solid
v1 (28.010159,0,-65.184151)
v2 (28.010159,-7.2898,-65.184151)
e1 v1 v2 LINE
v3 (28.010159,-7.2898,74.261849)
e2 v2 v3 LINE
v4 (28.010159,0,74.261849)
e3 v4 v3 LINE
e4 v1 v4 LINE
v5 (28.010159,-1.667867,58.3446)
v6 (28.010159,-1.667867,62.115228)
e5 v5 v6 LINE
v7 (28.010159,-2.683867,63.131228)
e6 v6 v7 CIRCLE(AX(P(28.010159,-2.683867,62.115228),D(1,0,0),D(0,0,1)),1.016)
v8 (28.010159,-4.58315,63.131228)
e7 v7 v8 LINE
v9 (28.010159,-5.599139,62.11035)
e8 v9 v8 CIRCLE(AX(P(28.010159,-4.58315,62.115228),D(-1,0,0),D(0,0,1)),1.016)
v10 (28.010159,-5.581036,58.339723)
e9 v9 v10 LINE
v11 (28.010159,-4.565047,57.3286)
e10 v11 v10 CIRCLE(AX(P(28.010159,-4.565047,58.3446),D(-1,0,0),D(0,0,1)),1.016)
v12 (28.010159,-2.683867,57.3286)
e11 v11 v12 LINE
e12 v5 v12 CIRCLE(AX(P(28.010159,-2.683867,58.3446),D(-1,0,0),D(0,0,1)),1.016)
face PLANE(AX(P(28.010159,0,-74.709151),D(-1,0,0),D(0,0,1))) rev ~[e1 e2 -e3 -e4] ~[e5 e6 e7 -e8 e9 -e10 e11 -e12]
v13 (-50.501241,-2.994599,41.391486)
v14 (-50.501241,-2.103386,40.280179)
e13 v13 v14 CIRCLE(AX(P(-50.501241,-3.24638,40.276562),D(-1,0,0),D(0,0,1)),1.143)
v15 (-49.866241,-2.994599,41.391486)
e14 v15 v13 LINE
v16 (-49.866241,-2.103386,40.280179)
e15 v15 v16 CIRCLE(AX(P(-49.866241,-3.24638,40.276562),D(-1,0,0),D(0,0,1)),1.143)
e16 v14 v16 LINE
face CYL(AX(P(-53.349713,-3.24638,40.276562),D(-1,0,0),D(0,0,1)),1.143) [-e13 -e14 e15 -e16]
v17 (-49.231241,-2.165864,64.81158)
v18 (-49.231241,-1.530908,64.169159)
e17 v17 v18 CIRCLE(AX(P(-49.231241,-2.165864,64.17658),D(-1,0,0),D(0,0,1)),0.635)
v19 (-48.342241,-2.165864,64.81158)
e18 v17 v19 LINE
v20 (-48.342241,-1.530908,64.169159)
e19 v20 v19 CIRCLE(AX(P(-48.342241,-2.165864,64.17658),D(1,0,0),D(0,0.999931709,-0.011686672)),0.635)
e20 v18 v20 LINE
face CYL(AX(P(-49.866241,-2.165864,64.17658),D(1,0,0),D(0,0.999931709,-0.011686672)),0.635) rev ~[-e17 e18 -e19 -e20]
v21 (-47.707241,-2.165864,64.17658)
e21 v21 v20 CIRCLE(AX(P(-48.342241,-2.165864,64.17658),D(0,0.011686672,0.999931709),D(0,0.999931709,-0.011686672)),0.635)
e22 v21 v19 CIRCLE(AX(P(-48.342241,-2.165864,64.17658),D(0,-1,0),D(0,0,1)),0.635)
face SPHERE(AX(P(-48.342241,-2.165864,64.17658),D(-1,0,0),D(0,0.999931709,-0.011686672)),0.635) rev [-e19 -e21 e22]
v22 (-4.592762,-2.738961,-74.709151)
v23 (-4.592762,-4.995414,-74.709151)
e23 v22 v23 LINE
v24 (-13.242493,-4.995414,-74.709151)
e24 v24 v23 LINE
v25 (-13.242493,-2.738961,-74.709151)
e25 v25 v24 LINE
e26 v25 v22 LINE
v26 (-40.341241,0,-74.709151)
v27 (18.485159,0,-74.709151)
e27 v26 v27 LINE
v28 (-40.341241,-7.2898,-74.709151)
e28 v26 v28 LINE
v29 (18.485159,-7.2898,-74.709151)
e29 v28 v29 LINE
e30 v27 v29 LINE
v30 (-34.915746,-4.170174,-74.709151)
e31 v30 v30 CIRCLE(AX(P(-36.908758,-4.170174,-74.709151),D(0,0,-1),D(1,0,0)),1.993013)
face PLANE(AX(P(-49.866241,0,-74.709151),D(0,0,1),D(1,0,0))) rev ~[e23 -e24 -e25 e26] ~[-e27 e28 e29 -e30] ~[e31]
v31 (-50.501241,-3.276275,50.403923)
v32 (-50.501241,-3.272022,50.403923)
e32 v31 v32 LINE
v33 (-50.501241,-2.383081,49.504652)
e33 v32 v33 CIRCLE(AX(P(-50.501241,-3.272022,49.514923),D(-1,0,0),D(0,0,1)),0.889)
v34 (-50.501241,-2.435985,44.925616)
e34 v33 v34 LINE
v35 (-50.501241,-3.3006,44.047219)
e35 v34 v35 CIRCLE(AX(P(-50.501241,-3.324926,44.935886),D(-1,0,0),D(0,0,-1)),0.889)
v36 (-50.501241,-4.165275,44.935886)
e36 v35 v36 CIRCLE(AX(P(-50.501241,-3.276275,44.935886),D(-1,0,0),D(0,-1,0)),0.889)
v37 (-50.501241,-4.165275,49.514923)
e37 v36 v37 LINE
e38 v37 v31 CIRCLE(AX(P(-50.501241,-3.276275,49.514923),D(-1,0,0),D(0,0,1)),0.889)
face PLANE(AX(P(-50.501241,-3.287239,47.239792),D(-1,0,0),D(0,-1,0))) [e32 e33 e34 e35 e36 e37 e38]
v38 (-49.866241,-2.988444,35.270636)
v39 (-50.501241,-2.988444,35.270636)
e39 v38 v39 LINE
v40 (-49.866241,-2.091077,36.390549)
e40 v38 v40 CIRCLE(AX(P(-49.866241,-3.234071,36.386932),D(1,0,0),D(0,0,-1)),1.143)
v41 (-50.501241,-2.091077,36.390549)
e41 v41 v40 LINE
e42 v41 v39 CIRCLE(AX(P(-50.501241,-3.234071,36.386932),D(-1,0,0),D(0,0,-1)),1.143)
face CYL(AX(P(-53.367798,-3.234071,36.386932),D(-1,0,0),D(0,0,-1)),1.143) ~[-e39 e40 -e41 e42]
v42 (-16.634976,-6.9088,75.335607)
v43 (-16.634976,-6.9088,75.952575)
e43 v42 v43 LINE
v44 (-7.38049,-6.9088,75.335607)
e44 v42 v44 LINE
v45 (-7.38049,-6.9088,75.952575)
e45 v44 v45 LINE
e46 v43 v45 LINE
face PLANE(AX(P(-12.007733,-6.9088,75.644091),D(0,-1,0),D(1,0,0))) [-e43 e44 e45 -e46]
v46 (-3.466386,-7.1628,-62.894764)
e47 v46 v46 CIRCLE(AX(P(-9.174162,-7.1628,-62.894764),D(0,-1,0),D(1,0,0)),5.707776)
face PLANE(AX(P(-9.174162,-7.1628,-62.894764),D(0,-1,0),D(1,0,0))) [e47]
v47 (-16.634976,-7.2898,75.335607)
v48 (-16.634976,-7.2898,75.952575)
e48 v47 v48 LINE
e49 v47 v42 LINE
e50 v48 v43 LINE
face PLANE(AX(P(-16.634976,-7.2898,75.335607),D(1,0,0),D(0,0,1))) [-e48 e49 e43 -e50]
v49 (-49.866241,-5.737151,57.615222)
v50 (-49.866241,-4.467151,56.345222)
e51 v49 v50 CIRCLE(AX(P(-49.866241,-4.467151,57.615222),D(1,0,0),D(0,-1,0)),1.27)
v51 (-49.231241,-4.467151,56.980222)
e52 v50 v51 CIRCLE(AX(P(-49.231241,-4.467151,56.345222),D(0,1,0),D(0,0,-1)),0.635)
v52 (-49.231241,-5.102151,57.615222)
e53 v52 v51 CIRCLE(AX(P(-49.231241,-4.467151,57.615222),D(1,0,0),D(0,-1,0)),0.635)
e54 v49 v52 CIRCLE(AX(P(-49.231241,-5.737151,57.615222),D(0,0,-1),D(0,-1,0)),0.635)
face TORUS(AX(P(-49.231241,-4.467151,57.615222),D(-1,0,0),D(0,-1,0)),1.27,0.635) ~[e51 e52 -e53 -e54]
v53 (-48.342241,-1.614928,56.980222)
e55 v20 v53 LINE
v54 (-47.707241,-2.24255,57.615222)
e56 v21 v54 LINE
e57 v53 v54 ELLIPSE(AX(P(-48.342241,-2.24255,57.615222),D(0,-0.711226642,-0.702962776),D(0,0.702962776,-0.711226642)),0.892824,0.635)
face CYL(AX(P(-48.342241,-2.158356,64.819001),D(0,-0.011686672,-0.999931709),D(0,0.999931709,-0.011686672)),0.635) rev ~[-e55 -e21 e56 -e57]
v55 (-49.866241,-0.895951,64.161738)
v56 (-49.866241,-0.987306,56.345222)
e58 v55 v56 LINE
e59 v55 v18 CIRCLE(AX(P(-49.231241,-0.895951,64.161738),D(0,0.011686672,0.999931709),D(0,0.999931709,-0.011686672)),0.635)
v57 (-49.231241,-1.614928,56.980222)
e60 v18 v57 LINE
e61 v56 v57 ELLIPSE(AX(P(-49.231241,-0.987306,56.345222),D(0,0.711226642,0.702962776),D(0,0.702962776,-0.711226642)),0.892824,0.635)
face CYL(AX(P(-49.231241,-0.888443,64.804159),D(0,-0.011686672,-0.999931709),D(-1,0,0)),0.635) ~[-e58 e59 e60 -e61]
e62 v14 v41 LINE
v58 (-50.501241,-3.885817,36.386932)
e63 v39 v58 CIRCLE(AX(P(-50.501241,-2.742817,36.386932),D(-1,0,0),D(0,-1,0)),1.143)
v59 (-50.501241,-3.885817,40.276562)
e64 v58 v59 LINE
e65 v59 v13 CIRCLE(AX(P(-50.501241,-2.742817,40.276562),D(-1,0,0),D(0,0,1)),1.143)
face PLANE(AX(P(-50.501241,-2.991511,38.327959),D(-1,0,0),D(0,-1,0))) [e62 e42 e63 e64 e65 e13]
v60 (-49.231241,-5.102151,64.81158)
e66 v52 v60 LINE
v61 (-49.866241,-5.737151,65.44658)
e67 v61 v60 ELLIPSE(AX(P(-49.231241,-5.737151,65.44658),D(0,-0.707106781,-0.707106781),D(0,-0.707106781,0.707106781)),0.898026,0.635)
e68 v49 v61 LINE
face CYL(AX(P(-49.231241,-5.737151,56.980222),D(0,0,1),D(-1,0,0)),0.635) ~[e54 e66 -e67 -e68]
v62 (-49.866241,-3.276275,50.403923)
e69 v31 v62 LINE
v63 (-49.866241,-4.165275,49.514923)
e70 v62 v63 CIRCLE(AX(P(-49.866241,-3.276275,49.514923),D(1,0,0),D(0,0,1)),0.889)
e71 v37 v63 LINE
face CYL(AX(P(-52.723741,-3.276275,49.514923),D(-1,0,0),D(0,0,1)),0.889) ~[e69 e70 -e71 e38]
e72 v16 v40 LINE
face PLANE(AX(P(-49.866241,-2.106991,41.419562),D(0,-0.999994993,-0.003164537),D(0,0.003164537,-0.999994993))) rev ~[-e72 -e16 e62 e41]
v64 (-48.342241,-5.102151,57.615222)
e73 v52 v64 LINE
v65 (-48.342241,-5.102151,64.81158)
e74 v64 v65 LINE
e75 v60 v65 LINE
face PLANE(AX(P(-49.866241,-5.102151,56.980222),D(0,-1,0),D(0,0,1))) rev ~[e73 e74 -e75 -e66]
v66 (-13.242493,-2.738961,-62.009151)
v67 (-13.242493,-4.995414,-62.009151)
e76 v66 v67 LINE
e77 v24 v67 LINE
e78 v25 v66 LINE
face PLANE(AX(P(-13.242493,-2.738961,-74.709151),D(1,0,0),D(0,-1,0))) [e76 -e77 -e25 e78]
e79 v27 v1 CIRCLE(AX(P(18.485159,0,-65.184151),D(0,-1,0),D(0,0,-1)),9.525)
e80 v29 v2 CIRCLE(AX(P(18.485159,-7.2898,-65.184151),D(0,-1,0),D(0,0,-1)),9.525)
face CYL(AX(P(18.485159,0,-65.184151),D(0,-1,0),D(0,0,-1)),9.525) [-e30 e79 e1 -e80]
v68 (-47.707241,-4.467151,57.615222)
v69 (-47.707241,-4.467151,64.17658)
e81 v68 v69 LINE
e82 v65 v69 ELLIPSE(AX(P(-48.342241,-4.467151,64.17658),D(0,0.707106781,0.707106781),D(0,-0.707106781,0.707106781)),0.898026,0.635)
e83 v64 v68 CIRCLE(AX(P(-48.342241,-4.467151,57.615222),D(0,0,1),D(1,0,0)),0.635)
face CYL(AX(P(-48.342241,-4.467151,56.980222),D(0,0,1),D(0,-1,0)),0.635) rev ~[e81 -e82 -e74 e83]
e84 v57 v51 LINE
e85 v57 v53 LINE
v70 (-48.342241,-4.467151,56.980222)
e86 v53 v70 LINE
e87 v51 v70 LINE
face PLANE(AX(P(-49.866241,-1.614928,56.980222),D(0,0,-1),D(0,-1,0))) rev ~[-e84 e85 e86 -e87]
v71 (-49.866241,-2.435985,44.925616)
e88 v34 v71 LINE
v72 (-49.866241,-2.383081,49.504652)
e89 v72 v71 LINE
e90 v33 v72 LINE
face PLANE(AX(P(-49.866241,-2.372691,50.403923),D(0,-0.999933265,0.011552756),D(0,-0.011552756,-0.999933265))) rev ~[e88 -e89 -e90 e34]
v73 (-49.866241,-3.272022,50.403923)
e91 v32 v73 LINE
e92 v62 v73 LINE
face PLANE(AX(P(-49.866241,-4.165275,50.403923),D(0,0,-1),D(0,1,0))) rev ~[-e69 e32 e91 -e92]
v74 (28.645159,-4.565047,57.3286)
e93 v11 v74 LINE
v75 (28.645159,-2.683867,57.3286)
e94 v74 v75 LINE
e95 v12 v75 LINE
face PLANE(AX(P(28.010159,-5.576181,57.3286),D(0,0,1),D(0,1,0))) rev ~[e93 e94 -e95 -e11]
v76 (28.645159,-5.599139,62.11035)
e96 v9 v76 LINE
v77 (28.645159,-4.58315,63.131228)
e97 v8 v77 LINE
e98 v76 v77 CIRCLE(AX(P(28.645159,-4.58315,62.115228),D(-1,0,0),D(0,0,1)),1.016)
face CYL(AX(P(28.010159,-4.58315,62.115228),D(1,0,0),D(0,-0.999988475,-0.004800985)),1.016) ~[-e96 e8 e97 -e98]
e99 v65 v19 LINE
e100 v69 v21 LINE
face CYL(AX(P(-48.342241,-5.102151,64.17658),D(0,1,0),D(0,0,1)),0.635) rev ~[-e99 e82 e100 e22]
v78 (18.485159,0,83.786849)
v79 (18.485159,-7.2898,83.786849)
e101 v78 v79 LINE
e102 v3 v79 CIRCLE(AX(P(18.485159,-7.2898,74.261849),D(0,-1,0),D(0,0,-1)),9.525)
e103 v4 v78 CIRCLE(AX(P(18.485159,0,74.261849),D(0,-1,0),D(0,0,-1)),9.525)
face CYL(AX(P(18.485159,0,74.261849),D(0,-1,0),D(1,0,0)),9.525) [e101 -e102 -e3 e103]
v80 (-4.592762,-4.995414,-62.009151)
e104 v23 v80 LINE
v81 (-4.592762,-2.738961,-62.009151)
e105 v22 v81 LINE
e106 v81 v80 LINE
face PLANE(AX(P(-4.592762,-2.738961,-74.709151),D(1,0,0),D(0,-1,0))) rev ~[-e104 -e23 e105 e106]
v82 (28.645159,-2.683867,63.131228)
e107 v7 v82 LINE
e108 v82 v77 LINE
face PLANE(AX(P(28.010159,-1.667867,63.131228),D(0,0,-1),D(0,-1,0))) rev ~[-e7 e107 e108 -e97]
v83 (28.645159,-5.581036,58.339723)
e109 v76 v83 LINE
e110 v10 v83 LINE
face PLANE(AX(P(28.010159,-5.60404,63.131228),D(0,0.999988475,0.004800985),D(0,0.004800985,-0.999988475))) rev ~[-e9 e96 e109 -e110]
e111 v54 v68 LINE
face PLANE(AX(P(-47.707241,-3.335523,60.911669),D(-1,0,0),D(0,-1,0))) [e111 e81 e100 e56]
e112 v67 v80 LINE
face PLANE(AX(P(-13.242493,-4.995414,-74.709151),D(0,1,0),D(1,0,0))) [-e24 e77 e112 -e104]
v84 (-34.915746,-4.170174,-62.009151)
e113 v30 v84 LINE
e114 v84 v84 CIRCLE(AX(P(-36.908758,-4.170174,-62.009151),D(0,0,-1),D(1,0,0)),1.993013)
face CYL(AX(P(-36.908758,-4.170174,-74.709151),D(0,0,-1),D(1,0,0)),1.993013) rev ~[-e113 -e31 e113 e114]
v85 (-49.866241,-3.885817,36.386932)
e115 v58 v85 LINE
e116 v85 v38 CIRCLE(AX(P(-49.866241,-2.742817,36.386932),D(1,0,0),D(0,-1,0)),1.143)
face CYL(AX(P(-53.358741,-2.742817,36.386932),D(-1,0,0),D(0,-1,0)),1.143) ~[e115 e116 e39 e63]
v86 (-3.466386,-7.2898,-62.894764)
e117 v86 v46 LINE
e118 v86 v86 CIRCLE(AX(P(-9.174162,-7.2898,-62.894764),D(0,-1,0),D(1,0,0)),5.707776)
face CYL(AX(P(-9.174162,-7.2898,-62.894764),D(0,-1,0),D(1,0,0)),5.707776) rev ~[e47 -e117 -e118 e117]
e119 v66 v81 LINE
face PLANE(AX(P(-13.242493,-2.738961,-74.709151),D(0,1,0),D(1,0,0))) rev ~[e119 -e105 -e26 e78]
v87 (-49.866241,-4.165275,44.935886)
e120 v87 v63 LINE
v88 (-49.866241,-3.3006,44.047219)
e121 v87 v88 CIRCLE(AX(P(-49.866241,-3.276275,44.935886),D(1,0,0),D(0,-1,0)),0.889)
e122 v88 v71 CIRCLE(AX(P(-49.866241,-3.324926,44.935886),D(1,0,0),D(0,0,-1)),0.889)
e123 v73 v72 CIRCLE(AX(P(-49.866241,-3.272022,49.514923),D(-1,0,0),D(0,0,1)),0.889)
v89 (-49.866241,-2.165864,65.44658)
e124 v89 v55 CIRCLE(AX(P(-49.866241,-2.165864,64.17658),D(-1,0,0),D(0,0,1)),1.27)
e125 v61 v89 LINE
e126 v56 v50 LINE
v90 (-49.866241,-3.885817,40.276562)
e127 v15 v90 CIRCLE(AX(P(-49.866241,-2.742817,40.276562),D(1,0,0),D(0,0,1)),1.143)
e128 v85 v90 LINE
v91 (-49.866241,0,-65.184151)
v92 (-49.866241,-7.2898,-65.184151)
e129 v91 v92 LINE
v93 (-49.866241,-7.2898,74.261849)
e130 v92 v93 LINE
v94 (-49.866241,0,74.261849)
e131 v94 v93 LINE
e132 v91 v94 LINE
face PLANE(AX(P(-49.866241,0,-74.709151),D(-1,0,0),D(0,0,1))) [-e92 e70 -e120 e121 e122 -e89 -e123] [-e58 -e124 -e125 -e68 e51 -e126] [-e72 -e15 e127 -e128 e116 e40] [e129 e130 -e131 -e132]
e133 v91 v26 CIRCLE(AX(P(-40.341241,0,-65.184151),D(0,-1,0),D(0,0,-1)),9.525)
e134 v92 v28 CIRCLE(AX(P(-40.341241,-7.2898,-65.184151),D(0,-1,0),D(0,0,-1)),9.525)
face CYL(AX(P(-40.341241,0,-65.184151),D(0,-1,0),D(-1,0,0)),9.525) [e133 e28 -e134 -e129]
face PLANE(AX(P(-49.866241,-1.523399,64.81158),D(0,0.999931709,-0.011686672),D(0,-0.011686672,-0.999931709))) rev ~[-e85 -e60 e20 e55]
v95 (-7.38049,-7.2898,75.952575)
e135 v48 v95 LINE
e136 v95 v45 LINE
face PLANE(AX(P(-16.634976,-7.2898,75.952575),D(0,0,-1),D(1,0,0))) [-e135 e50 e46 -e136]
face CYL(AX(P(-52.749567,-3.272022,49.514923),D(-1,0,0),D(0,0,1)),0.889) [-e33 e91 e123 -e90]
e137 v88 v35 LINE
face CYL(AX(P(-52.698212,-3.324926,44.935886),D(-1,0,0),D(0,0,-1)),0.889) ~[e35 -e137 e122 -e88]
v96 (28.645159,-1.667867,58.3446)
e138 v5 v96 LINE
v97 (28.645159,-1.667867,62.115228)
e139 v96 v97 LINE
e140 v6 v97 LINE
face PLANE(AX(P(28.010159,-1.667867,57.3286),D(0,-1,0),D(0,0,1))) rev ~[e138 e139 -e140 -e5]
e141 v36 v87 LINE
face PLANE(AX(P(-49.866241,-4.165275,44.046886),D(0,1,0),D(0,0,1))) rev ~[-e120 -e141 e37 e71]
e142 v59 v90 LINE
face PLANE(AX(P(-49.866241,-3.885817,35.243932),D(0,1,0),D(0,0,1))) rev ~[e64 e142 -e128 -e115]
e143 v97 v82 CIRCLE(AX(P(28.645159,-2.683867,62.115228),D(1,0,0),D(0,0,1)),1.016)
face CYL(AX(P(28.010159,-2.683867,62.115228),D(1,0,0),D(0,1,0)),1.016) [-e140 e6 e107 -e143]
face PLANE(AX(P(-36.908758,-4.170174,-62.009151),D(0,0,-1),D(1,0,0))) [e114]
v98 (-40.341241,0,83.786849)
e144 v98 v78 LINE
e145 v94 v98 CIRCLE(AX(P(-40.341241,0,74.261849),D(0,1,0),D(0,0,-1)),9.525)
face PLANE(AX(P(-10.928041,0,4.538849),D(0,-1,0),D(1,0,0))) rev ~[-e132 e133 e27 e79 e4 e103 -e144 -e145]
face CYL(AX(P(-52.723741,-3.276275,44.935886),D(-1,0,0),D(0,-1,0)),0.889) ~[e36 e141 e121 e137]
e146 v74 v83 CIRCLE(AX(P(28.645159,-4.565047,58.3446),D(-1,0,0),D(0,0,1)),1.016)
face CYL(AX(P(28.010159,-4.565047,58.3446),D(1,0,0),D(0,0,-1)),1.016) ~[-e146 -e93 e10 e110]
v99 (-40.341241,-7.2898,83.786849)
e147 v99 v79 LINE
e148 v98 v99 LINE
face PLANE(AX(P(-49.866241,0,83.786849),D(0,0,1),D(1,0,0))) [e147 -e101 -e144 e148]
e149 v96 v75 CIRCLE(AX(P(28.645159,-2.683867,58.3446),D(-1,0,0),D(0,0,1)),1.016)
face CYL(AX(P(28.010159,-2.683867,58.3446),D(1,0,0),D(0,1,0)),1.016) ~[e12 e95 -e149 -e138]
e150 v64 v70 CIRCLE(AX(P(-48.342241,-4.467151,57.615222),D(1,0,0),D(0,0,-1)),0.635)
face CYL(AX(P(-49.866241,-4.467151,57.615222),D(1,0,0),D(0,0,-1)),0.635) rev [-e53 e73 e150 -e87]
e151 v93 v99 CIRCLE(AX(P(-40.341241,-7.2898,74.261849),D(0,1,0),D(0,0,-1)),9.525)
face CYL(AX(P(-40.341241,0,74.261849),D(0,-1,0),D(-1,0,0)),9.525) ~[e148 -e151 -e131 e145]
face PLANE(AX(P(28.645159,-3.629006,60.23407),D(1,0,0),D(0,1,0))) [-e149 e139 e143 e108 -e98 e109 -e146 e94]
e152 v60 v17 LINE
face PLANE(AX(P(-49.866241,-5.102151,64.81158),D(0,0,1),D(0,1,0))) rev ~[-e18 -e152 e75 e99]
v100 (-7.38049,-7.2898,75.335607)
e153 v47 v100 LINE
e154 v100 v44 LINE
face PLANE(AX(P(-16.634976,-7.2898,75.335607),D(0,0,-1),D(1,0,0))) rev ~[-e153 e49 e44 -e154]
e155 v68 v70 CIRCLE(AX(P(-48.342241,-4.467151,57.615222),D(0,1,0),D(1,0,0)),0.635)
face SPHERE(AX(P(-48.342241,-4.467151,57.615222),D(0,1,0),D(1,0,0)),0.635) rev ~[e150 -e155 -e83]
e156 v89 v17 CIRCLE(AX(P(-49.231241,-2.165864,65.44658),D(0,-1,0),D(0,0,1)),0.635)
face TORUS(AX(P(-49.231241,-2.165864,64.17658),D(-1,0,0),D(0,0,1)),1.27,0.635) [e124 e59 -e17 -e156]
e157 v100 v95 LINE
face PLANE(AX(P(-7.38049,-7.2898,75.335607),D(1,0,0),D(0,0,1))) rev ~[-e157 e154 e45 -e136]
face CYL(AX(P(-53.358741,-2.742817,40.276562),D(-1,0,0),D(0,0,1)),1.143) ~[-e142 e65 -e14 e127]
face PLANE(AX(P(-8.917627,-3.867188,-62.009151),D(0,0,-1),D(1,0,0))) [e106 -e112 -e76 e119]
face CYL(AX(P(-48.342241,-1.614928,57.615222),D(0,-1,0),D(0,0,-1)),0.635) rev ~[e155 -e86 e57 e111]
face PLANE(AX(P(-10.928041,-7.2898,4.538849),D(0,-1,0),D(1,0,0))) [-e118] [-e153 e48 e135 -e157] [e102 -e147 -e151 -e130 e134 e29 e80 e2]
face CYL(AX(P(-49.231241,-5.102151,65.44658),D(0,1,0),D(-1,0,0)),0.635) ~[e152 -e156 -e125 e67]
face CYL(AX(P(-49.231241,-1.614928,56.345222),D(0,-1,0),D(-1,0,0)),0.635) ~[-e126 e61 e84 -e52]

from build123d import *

# Parameters (mm, degrees)
F0_W         = 77.8764
F0_H         = 158.496
F1_DEPTH     = 7.2898
F2_R         = 9.525
F3_R         = 5.7077755574
F4_DEPTH     = 0.127
F5_W         = 9.2544863001
F5_H         = 0.6169676781
F6_DEPTH     = 0.381
F8_DEPTH     = 0.635
F9_R         = 1.016
F10_R        = 1.9930126565
F11_DEPTH    = 12.7
F13_W        = 8.6497310549
F13_H        = 2.2564521059
F14_DEPTH    = 12.7
F16_DEPTH    = 2.159
F18_DEPTH    = 0.635
F19_T1_DEPTH = 2.8833260431
F19_T3_DEPTH = 2.8575
F19_T5_DEPTH = 2.8319706152
F21_DEPTH    = 0.635
F22_T1_DEPTH = 3.4834715988
F22_T3_DEPTH = 3.4925
F22_T5_DEPTH = 3.5015570173
F23_R        = 0.635


# Not quite as in the source:
# - a fillet or chamfer that OpenCascade refuses, or shapes differently, is made with other operations: its cross-section is extruded or revolved along the edge and cut away or added


with BuildPart() as f1:
    # F0 (on Front) → F1 (new body)
    with BuildSketch(Plane.XZ):
        with Locations((-10.9280409528, 4.5388489962)):
            Rectangle(F0_W, F0_H)
    extrude(amount=F1_DEPTH)

    # F2
    f2_edges = [f1.edges().sort_by_distance(p)[0] for p in [
        (-49.866241, -3.6449, 83.786849),
        (28.010159, -3.6449, 83.786849),
        (28.010159, -3.6449, -74.709151),
        (-49.866241, -3.6449, -74.709151),
    ]]
    fillet(f2_edges, radius=F2_R)

    # F3 (on face) → F4 (cut)
    with BuildSketch(Plane.XZ.offset(7.2898)):
        with Locations((-9.174161778, -62.8947635373)):
            Circle(F3_R)
    extrude(amount=-F4_DEPTH, mode=Mode.SUBTRACT)

    # F5 (on face) → F6 (cut)
    with BuildSketch(Plane.XZ.offset(7.2898)):
        with Locations((-12.0077328756, 75.6440907717)):
            Rectangle(F5_W, F5_H)
    extrude(amount=-F6_DEPTH, mode=Mode.SUBTRACT)

    # F7 (on face) → F8 (join)
    with BuildSketch(Plane.YZ.offset(28.0101590472)):
        Polygon((-1.6678672982, 63.1312280893), (-5.6040398777, 63.1312280893), (-5.5761812255, 57.3286004364), (-1.6678672982, 57.3286004364), align=None)
    extrude(amount=F8_DEPTH)

    # F9
    f9_edges = [f1.edges().sort_by_distance(p)[0] for p in [
        (28.327659, -5.60404, 63.131228),
        (28.327659, -5.576181, 57.3286),
        (28.327659, -1.667867, 63.131228),
        (28.327659, -1.667867, 57.3286),
    ]]
    fillet(f9_edges, radius=F9_R)

    # F10 (on face) → F11 (cut)
    with BuildSketch(Plane(origin=(0, 0, -74.7091510038), x_dir=(1, 0, 0), z_dir=(0, 0, -1))):
        with Locations((-36.9087584466, 4.1701743638)):
            Circle(F10_R)
    extrude(amount=-F11_DEPTH, mode=Mode.SUBTRACT)

    # F13 (on face) → F14 (cut)
    with BuildSketch(Plane(origin=(0, 0, -74.7091510038), x_dir=(1, 0, 0), z_dir=(0, 0, -1))):
        with Locations((-8.9176273905, 3.8671875373)):
            Rectangle(F13_W, F13_H)
    extrude(amount=-F14_DEPTH, mode=Mode.SUBTRACT)

    # F15 (on face) → F16 (cut)
    with BuildSketch(Plane(origin=(-49.8662409528, 0, 0), x_dir=(0, -1, 0), z_dir=(-1, 0, 0))):
        Polygon((1.5233993763, 64.8115798831), (1.6149281291, 56.9802224636), (5.1021506079, 56.9802224636), (5.1021506079, 64.8115798831), align=None)
    extrude(amount=-F16_DEPTH, mode=Mode.SUBTRACT)

    # F17 (on face) → F18 (join)
    with BuildSketch(Plane(origin=(-49.8662409528, 0, 0), x_dir=(0, -1, 0), z_dir=(-1, 0, 0))):
        Polygon((2.3726914078, 50.4039227962), (2.4461376015, 44.0468862653), (4.1652750224, 44.0468862653), (4.1652750224, 50.4039227962), align=None)
    extrude(amount=F18_DEPTH)

    # F19: fillet of radius 0.889 on 4 edges, made by hand

    # F19_s2 → F19_t1 (cut)
    with BuildSketch(Plane.YZ.offset(-52.7495669959)):
        with BuildLine():
            ThreePointArc((-3.272021825, 50.4039227962), (-2.639783189, 50.1398990415), (-2.3830811527, 49.5046523961))
            Line((-2.3830811527, 49.5046523961), (-2.3726914078, 50.4039227962))
            Line((-2.3726914078, 50.4039227962), (-3.272021825, 50.4039227962))
        make_face()
    extrude(amount=F19_T1_DEPTH, mode=Mode.SUBTRACT)

    # F19_s4 → F19_t3 (cut)
    with BuildSketch(Plane.YZ.offset(-52.7237409528)):
        with BuildLine():
            ThreePointArc((-3.2762750224, 50.4039227962), (-3.9048929509, 50.1435407247), (-4.1652750224, 49.5149227962))
            Line((-4.1652750224, 49.5149227962), (-4.1652750224, 50.4039227962))
            Line((-4.1652750224, 50.4039227962), (-3.2762750224, 50.4039227962))
        make_face()
        with BuildLine():
            ThreePointArc((-4.1652750224, 44.9358862653), (-3.9048929509, 44.3072683368), (-3.2762750224, 44.0468862653))
            Line((-3.2762750224, 44.0468862653), (-4.1652750224, 44.0468862653))
            Line((-4.1652750224, 44.0468862653), (-4.1652750224, 44.9358862653))
        make_face()
    extrude(amount=F19_T3_DEPTH, mode=Mode.SUBTRACT)

    # F19_s6 → F19_t5 (cut)
    with BuildSketch(Plane.YZ.offset(-52.698211568)):
        with BuildLine():
            ThreePointArc((-3.3249258476, 44.0468862653), (-2.6999496023, 44.3036476293), (-2.4359851753, 44.9256158651))
            Line((-2.4359851753, 44.9256158651), (-2.4461376015, 44.0468862653))
            Line((-2.4461376015, 44.0468862653), (-3.3249258476, 44.0468862653))
        make_face()
    extrude(amount=F19_T5_DEPTH, mode=Mode.SUBTRACT)

    # F20 (on face) → F21 (join)
    with BuildSketch(Plane(origin=(-49.8662409528, 0, 0), x_dir=(0, -1, 0), z_dir=(-1, 0, 0))):
        Polygon((2.1069913637, 41.4195619524), (2.087448258, 35.2439321578), (3.8858172484, 35.2439321578), (3.8858172484, 41.4195619524), align=None)
    extrude(amount=F21_DEPTH)

    # F22: fillet of radius 1.143 on 4 edges, made by hand

    # F22_s2 → F22_t1 (cut)
    with BuildSketch(Plane.YZ.offset(-53.3497125516)):
        with BuildLine():
            ThreePointArc((-3.2463800032, 41.4195619524), (-2.4394367914, 41.0860628189), (-2.1033857264, 40.2801790179))
            Line((-2.1033857264, 40.2801790179), (-2.1069913637, 41.4195619524))
            Line((-2.1069913637, 41.4195619524), (-3.2463800032, 41.4195619524))
        make_face()
    extrude(amount=F22_T1_DEPTH, mode=Mode.SUBTRACT)

    # F22_s4 → F22_t3 (cut)
    with BuildSketch(Plane.YZ.offset(-53.3587409528)):
        with BuildLine():
            ThreePointArc((-2.7428172484, 41.4195619524), (-3.5510402993, 41.0847850032), (-3.8858172484, 40.2765619524))
            Line((-3.8858172484, 40.2765619524), (-3.8858172484, 41.4195619524))
            Line((-3.8858172484, 41.4195619524), (-2.7428172484, 41.4195619524))
        make_face()
        with BuildLine():
            ThreePointArc((-3.8858172484, 36.3869321578), (-3.5510402993, 35.5787091069), (-2.7428172484, 35.2439321578))
            Line((-2.7428172484, 35.2439321578), (-3.8858172484, 35.2439321578))
            Line((-3.8858172484, 35.2439321578), (-3.8858172484, 36.3869321578))
        make_face()
    extrude(amount=F22_T3_DEPTH, mode=Mode.SUBTRACT)

    # F22_s6 → F22_t5 (cut)
    with BuildSketch(Plane.YZ.offset(-53.3677979701)):
        with BuildLine():
            ThreePointArc((-3.2340710649, 35.2439321578), (-2.4245701983, 35.579988946), (-2.091076788, 36.3905492233))
            Line((-2.091076788, 36.3905492233), (-2.087448258, 35.2439321578))
            Line((-2.087448258, 35.2439321578), (-3.2340710649, 35.2439321578))
        make_face()
    extrude(amount=F22_T5_DEPTH, mode=Mode.SUBTRACT)

    # F23
    f23_edges = [f1.edges().sort_by_distance(p)[0] for p in [
        (-47.707241, -1.569164, 60.895901),
        (-47.707241, -3.358539, 56.980222),
        (-47.707241, -5.102151, 60.895901),
        (-47.707241, -3.312775, 64.81158),
        (-49.866241, -1.569164, 60.895901),
        (-48.786741, -5.102151, 56.980222),
        (-48.786741, -1.523399, 64.81158),
        (-49.866241, -5.102151, 60.895901),
        (-49.866241, -3.312775, 64.81158),
        (-49.866241, -3.358539, 56.980222),
    ]]
    fillet(f23_edges, radius=F23_R)


solid = f1.part
